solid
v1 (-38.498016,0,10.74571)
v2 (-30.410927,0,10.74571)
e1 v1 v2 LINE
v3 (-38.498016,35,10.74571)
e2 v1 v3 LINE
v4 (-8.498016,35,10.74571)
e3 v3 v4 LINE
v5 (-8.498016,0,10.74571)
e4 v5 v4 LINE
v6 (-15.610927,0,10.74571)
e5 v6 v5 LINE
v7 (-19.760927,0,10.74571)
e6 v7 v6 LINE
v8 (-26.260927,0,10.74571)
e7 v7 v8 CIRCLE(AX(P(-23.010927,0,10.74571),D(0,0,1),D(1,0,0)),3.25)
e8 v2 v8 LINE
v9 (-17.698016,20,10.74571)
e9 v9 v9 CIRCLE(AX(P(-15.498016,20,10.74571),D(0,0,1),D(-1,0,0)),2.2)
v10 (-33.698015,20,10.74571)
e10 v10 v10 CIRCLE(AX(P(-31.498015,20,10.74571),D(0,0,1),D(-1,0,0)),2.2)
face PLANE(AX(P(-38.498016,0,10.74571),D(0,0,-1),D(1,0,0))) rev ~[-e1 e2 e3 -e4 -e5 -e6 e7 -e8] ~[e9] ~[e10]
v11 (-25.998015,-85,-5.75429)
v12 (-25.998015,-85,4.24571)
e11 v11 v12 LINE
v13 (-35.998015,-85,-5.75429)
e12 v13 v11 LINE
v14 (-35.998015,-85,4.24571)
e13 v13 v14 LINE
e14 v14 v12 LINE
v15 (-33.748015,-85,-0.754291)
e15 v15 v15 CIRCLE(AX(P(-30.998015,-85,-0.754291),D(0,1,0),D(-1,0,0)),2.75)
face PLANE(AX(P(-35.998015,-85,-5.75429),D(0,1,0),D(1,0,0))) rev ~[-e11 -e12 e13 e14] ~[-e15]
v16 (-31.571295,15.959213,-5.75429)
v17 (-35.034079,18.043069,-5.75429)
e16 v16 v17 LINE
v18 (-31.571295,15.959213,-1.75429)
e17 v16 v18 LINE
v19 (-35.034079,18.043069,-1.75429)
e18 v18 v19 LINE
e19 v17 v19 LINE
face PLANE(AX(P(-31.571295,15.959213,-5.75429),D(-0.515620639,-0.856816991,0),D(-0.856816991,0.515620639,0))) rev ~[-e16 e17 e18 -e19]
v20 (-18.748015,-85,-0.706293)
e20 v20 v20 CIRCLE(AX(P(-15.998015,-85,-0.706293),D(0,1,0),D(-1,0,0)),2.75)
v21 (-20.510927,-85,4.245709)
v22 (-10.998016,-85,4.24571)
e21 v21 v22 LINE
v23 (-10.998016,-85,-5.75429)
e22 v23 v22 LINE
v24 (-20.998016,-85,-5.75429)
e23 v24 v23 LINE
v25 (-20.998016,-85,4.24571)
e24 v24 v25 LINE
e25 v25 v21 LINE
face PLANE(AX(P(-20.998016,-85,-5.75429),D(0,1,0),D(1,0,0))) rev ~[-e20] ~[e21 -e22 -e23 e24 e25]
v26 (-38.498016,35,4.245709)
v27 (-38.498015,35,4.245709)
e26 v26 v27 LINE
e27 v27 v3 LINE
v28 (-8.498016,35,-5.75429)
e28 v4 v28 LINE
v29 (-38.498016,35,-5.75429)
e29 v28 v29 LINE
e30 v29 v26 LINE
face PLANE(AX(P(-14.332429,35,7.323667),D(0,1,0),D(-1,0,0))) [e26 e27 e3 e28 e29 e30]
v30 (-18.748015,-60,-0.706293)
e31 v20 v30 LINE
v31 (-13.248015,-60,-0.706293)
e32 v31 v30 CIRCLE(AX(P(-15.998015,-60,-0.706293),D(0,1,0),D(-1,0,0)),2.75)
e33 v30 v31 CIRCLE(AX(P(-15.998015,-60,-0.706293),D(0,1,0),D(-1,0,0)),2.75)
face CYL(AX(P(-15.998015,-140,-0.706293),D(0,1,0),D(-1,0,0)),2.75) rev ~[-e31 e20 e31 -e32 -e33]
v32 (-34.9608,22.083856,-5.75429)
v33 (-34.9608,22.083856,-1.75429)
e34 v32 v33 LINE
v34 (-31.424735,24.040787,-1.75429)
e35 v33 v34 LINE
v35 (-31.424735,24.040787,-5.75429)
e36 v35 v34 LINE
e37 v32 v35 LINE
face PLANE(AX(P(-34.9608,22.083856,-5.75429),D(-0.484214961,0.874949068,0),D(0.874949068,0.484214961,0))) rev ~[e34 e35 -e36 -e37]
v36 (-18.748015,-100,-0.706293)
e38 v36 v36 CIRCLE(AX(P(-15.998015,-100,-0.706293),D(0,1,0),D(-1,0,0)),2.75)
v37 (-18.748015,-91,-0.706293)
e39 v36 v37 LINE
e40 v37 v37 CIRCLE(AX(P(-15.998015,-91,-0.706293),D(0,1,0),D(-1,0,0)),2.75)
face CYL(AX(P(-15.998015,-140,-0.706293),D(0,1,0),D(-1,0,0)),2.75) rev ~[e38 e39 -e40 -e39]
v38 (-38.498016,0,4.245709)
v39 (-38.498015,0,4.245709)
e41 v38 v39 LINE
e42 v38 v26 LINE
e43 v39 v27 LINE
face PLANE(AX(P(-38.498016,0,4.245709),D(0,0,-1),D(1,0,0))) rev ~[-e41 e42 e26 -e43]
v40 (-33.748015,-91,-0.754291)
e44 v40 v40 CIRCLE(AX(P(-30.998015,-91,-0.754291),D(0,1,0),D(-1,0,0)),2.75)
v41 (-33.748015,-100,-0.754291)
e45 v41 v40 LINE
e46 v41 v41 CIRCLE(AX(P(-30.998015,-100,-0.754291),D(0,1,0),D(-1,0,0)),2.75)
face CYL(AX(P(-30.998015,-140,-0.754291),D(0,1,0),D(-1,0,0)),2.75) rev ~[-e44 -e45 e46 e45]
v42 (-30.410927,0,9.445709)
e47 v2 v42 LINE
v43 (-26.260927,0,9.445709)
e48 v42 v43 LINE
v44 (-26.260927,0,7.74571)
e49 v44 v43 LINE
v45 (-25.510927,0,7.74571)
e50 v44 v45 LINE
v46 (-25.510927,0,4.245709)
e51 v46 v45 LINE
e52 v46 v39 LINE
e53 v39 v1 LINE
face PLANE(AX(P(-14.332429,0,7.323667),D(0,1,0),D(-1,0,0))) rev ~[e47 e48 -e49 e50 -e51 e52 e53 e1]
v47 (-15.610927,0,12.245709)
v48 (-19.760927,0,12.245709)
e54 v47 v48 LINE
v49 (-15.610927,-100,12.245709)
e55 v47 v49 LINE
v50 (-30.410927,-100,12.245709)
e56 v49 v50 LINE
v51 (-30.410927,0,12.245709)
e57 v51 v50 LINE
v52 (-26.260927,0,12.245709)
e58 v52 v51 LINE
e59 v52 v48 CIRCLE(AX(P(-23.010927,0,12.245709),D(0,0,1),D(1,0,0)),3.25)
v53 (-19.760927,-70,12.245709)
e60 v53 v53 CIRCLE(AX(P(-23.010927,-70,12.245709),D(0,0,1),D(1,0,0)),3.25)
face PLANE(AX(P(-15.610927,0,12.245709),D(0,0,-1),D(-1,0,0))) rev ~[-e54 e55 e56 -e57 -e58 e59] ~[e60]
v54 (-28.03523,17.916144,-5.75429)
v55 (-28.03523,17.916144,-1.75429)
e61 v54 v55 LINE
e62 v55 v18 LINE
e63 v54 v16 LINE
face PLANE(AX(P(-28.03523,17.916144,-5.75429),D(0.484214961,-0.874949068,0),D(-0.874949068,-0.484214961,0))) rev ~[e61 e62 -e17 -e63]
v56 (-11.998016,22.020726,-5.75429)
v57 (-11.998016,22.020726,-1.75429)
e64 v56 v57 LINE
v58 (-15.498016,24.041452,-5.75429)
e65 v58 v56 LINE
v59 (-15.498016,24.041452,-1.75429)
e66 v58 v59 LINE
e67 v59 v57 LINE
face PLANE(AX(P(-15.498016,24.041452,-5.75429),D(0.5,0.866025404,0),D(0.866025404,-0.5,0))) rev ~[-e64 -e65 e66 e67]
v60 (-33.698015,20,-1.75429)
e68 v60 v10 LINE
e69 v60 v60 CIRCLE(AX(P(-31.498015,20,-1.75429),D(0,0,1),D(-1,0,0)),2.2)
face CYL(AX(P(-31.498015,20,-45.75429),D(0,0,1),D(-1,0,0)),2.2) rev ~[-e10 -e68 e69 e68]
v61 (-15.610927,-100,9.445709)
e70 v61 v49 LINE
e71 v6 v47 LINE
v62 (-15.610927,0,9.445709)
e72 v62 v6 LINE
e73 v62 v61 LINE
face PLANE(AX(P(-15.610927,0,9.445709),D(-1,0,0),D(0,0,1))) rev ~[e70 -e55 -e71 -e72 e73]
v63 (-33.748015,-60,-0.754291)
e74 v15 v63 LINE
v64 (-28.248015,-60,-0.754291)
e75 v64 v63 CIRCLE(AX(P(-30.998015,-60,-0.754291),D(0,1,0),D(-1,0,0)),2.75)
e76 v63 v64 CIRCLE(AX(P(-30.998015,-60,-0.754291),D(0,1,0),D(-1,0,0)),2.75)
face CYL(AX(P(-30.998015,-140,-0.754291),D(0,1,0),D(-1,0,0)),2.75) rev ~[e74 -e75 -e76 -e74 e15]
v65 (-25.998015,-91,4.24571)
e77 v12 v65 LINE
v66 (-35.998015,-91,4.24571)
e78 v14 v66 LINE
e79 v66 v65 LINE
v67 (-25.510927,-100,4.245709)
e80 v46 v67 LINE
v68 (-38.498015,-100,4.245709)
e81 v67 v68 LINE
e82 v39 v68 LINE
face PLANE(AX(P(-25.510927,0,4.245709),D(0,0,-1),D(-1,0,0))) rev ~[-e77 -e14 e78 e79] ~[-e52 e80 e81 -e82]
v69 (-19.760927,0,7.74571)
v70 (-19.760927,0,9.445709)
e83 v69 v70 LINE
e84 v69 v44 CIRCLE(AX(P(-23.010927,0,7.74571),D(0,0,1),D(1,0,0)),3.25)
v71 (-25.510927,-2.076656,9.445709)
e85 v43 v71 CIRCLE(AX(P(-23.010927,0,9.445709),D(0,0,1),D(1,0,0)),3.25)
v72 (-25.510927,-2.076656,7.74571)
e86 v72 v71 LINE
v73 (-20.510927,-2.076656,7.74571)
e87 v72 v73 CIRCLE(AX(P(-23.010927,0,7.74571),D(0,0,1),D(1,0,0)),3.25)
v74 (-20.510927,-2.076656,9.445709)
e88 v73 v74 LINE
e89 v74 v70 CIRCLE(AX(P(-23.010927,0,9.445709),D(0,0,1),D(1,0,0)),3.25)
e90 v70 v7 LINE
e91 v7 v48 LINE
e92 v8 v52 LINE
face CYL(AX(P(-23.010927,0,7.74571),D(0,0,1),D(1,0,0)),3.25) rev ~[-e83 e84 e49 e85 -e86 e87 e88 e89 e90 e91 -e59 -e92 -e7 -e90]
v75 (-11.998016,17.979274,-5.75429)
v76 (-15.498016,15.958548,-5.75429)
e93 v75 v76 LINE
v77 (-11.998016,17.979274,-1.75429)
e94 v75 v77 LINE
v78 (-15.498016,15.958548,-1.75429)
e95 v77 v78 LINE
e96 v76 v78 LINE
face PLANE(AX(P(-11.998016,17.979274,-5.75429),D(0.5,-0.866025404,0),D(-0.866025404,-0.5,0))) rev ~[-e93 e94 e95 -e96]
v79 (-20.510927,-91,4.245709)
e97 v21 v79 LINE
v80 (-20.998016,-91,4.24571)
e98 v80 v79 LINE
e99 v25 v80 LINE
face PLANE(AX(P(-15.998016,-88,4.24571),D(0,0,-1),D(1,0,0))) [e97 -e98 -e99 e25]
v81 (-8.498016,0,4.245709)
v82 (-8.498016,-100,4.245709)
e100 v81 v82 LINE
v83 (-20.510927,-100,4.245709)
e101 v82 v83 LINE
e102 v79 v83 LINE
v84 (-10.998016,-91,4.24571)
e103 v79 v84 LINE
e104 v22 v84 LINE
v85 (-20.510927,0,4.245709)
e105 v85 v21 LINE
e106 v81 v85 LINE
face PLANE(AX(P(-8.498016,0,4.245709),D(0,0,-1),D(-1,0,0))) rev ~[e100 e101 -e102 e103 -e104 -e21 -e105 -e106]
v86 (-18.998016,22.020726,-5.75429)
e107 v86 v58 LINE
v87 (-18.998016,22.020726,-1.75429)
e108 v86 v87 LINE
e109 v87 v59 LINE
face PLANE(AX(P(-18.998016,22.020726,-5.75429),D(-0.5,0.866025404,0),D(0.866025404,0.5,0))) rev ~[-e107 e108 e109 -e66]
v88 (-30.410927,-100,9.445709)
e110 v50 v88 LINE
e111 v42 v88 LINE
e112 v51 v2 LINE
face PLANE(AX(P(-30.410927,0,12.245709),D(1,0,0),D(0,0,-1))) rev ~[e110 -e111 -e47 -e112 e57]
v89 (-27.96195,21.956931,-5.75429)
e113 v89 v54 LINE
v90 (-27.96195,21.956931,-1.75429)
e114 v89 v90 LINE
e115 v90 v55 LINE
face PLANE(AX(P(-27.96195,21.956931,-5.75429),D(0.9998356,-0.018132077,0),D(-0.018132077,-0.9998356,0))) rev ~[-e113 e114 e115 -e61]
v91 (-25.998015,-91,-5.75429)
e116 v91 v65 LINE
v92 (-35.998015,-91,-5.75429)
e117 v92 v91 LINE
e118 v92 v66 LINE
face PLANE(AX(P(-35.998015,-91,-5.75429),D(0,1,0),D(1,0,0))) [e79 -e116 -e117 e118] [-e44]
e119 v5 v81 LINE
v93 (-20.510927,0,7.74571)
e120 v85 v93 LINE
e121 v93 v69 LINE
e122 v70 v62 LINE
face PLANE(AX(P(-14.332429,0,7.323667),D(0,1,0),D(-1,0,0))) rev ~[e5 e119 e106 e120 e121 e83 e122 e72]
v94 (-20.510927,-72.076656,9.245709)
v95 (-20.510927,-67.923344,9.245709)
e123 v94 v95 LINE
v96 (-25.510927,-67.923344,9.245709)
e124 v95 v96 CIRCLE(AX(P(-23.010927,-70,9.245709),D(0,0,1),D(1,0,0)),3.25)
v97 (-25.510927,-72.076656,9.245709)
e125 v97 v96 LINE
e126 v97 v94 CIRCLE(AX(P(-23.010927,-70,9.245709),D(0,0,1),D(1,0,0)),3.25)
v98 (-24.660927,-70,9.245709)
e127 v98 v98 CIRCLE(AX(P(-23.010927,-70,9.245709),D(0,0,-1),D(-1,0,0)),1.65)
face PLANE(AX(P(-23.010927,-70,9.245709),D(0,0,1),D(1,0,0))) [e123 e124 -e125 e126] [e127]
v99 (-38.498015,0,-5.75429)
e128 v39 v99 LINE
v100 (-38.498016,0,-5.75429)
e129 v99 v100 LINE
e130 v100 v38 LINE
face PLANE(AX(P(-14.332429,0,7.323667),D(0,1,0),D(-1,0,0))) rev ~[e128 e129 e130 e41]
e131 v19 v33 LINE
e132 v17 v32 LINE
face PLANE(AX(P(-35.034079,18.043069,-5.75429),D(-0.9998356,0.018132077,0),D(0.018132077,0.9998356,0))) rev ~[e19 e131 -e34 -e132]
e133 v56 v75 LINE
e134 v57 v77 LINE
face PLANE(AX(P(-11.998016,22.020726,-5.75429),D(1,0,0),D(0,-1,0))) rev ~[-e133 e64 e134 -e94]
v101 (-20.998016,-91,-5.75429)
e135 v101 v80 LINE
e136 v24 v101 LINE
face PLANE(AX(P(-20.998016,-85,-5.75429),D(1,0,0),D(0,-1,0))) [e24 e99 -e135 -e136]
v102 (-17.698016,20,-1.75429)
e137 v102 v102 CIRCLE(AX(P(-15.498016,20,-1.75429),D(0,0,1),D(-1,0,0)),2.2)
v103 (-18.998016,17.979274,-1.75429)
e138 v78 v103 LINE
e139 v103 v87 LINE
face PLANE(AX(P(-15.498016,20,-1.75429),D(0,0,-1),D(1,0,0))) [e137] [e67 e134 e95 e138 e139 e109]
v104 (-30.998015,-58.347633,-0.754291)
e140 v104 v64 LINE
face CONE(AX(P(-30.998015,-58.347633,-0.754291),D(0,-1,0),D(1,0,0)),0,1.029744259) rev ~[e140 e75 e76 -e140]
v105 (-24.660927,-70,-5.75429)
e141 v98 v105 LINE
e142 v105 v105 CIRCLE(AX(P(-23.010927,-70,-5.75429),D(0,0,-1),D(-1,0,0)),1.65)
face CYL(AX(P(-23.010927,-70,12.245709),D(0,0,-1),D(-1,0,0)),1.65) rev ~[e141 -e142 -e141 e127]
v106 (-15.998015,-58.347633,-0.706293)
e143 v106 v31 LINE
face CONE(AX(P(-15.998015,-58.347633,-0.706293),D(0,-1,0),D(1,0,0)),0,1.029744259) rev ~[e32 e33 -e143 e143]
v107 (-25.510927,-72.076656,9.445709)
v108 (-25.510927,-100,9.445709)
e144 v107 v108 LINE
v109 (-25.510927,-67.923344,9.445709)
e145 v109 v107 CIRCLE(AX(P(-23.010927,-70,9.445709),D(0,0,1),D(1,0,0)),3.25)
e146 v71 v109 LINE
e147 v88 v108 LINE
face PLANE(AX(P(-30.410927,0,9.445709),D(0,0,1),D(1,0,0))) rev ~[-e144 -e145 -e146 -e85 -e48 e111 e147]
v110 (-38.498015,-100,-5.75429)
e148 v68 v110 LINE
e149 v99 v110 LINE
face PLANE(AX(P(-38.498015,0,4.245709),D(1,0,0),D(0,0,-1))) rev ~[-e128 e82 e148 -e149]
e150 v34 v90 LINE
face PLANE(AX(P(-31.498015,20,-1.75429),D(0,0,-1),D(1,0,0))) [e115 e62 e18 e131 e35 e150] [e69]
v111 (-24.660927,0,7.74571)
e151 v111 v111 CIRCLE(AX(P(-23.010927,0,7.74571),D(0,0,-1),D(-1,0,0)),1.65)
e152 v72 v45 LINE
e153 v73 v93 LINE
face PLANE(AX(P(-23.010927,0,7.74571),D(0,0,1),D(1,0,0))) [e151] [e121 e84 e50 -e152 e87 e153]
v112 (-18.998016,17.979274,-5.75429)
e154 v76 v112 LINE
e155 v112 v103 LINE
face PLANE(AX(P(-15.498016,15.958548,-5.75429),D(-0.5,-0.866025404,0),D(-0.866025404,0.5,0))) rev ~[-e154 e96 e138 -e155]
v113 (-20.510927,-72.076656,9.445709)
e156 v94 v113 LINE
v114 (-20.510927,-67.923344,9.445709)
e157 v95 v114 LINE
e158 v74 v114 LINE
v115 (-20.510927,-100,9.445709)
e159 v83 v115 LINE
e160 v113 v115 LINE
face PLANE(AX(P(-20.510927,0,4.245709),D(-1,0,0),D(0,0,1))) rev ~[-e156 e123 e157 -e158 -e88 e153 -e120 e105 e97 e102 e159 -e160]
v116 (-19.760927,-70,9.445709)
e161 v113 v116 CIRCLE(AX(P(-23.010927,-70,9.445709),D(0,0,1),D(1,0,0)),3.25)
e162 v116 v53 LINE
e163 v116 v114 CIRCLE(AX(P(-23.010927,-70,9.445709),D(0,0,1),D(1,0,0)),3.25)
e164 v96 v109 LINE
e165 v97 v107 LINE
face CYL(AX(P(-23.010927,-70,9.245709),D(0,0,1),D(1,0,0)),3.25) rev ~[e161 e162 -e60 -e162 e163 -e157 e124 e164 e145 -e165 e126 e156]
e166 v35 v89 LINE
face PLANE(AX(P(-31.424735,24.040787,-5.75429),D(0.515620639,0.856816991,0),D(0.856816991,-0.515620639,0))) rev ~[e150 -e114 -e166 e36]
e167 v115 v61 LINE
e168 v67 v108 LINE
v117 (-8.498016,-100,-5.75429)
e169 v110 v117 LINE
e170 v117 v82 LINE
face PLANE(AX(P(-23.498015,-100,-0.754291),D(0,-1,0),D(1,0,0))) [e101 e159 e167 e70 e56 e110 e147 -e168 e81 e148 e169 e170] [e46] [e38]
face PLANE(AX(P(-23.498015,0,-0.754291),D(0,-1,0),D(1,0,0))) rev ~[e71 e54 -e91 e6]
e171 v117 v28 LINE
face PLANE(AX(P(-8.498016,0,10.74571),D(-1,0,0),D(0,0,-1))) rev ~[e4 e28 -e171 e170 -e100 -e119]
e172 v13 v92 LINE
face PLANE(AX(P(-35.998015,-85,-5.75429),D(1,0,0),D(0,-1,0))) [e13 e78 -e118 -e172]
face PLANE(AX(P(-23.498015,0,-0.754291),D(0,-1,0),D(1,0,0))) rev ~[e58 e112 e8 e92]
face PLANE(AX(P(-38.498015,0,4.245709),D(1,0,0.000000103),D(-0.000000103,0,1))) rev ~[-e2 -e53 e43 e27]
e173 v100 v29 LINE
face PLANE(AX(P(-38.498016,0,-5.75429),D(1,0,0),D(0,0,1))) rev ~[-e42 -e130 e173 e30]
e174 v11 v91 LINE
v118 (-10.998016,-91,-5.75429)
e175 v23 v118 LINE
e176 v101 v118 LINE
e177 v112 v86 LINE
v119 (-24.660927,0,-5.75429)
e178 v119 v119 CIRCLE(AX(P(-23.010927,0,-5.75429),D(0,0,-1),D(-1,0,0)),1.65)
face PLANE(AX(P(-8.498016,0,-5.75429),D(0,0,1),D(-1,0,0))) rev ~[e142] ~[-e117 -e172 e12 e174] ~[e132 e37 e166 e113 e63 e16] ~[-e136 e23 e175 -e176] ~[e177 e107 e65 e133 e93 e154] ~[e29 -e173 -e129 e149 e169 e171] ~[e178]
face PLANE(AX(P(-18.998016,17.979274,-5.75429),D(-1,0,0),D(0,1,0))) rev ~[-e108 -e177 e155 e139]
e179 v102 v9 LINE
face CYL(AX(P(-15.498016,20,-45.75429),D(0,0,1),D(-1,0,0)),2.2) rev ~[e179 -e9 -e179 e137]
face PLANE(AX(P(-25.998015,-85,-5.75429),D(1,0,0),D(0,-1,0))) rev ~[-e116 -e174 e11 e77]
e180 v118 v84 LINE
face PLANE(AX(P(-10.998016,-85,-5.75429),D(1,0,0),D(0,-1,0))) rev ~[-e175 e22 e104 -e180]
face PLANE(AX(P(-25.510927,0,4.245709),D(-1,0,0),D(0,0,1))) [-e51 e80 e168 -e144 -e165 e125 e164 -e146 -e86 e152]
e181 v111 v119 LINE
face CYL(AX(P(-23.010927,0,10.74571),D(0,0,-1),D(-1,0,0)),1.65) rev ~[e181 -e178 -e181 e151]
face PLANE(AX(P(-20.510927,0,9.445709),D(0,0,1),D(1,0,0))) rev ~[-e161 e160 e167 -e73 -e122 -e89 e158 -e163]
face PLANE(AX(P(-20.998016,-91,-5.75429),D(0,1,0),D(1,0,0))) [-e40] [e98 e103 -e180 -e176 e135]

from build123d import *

# Parameters (mm, degrees)
F0_R            = 2.5000000706
F0_R_2          = 2.5000000298
F0_W            = 4.9999998882
F0_H            = 5.2
F1_DEPTH        = 100
F3_DEPTH        = 35
F6_D            = 4.4
F6_DEPTH        = 40
F6_TIP          = 1.3218933619
F5_W            = 10
F5_H            = 6
F7_DEPTH        = 10
F9_D            = 5.5
F9_DEPTH        = 40
F9_TIP          = 1.6523667023
F11_D           = 3.3
F11_DEPTH       = 20
F11_START       = 1.4999997
F11_CBORE_D     = 6.5
F11_CBORE_DEPTH = 3
F11_TIP         = 0.9914200214
F12_DEPTH       = 4


# Not quite as in the source:
# - after a boolean that leaves OpenCascade's solid faulty, fix() repairs it
# - ends of sketch curves that miss each other by under 0.0002 mm in the source are joined
# - a feature names something its author has since deleted; it is built from what else it names


with BuildPart() as f1:
    # F0 (on Front) → F1 (new body)
    with BuildSketch(Plane.XZ):
        Polygon((-38.4980148883, 4.2457092745), (-38.4980148883, -5.7542903855), (-8.4980155588, -5.7542903855), (-8.4980155588, 4.2457092745), (-15.6109269008, 4.2457092745), (-20.5109269008, 4.2457092745), (-25.510926789, 4.2457092745), (-30.410926789, 4.2457092745), align=None)
        with Locations((-30.9980151824, -0.7542907016)):
            Circle(F0_R, mode=Mode.SUBTRACT)
        with Locations((-15.9980151584, -0.7062930843)):
            Circle(F0_R_2, mode=Mode.SUBTRACT)
        with Locations((-23.0109268449, 6.8457092745)):
            Rectangle(F0_W, F0_H)
        with Locations((-30.9980151824, -0.7542907016)):
            Circle(F0_R)
        with Locations((-15.9980151584, -0.7062930843)):
            Circle(F0_R_2)
        Polygon((-30.410926789, 12.2457092745), (-30.410926789, 9.4457092745), (-25.510926789, 9.4457092745), (-20.5109269008, 9.4457092745), (-15.6109269008, 9.4457092745), (-15.6109269008, 12.2457092745), align=None)
    extrude(amount=F1_DEPTH)

    # F2 (on face) → F3 (join)
    with BuildSketch(Plane(origin=(0, 0, 0), x_dir=(-1, 0, 0), z_dir=(0, 1, 0))):
        Polygon((8.4980155588, 10.7457096145), (8.4980155588, 4.2457092745), (20.5109269008, 4.2457092745), (20.5109269008, 9.4457092745), (15.6109269008, 9.4457092745), (15.6109269008, 10.7457096145), align=None)
        Polygon((25.510926789, 4.2457092745), (38.4980148883, 4.2457092745), (38.4980155588, 10.7457096145), (30.410926789, 10.7457096145), (30.410926789, 9.4457092745), (25.510926789, 9.4457092745), align=None)
        Polygon((8.4980155588, 4.2457092745), (8.4980155588, -5.7542903855), (38.4980155588, -5.7542903855), (38.4980155588, 4.2457092745), (25.510926789, 4.2457092745), (25.510926789, 9.4457092745), (30.410926789, 9.4457092745), (30.410926789, 10.7457096145), (15.6109269008, 10.7457096145), (15.6109269008, 9.4457092745), (20.5109269008, 9.4457092745), (20.5109269008, 4.2457092745), align=None)
    extrude(amount=F3_DEPTH)

    # F4: union 

    # F6
    with Locations(Plane(origin=(0, 0, -5.7542903855), x_dir=(1, 0, 0), z_dir=(0, 0, -1))):
        with Locations((-15.4980155588, -20), (-31.4980148883, -20)):
            Hole(F6_D / 2, depth=F6_DEPTH)
            with Locations((0, 0, -(F6_DEPTH + F6_TIP / 2))):  # 118° drill point
                Cone(0, F6_D / 2, F6_TIP, mode=Mode.SUBTRACT)

    # F5 (on face) → F7 (cut)
    with BuildSketch(Plane(origin=(0, 0, -5.7542903855), x_dir=(1, 0, 0), z_dir=(0, 0, -1))):
        with Locations((-15.9980155588, 88)):
            Rectangle(F5_W, F5_H)
        with Locations((-30.9980148883, 88)):
            Rectangle(F5_W, F5_H)
    extrude(amount=-F7_DEPTH, mode=Mode.SUBTRACT)

    add(f1.part.fix(), mode=Mode.REPLACE)

    # F9
    with Locations(Plane.XZ.offset(100)):
        with Locations((-30.9980151824, -0.7542907016), (-15.9980151584, -0.7062930843)):
            Hole(F9_D / 2, depth=F9_DEPTH)
            with Locations((0, 0, -(F9_DEPTH + F9_TIP / 2))):  # 118° drill point
                Cone(0, F9_D / 2, F9_TIP, mode=Mode.SUBTRACT)

    # F11
    # its depths count from where the whole tool has entered the part; down to there all is cleared
    with Locations(Plane.XY.offset(12.2457092745)):
        with Locations((-23.0109268449, 0, -F11_START), (-23.0109268449, -70, 0)):
            CounterBoreHole(F11_D / 2, F11_CBORE_D / 2, F11_CBORE_DEPTH, depth=F11_DEPTH)
            with Locations((0, 0, -(F11_DEPTH + F11_TIP / 2))):  # 118° drill point
                Cone(0, F11_D / 2, F11_TIP, mode=Mode.SUBTRACT)

    # F5 (on face) → F12 (cut)
    with BuildSketch(Plane(origin=(0, 0, -5.7542903855), x_dir=(1, 0, 0), z_dir=(0, 0, -1))):
        Polygon((-18.9980155588, -17.9792740578), (-18.9980155588, -22.0207259422), (-15.4980155588, -24.0414518843), (-11.9980155588, -22.0207259422), (-11.9980155588, -17.9792740578), (-15.4980155588, -15.9585481157), align=None)
        Polygon((-31.4247349717, -24.0407874712), (-27.9619503287, -21.9569314662), (-28.0352302453, -17.9161439951), (-31.5712948049, -15.9592125288), (-35.0340794479, -18.0430685338), (-34.9607995313, -22.0838560049), align=None)
    extrude(amount=-F12_DEPTH, mode=Mode.SUBTRACT)


solid = f1.part
